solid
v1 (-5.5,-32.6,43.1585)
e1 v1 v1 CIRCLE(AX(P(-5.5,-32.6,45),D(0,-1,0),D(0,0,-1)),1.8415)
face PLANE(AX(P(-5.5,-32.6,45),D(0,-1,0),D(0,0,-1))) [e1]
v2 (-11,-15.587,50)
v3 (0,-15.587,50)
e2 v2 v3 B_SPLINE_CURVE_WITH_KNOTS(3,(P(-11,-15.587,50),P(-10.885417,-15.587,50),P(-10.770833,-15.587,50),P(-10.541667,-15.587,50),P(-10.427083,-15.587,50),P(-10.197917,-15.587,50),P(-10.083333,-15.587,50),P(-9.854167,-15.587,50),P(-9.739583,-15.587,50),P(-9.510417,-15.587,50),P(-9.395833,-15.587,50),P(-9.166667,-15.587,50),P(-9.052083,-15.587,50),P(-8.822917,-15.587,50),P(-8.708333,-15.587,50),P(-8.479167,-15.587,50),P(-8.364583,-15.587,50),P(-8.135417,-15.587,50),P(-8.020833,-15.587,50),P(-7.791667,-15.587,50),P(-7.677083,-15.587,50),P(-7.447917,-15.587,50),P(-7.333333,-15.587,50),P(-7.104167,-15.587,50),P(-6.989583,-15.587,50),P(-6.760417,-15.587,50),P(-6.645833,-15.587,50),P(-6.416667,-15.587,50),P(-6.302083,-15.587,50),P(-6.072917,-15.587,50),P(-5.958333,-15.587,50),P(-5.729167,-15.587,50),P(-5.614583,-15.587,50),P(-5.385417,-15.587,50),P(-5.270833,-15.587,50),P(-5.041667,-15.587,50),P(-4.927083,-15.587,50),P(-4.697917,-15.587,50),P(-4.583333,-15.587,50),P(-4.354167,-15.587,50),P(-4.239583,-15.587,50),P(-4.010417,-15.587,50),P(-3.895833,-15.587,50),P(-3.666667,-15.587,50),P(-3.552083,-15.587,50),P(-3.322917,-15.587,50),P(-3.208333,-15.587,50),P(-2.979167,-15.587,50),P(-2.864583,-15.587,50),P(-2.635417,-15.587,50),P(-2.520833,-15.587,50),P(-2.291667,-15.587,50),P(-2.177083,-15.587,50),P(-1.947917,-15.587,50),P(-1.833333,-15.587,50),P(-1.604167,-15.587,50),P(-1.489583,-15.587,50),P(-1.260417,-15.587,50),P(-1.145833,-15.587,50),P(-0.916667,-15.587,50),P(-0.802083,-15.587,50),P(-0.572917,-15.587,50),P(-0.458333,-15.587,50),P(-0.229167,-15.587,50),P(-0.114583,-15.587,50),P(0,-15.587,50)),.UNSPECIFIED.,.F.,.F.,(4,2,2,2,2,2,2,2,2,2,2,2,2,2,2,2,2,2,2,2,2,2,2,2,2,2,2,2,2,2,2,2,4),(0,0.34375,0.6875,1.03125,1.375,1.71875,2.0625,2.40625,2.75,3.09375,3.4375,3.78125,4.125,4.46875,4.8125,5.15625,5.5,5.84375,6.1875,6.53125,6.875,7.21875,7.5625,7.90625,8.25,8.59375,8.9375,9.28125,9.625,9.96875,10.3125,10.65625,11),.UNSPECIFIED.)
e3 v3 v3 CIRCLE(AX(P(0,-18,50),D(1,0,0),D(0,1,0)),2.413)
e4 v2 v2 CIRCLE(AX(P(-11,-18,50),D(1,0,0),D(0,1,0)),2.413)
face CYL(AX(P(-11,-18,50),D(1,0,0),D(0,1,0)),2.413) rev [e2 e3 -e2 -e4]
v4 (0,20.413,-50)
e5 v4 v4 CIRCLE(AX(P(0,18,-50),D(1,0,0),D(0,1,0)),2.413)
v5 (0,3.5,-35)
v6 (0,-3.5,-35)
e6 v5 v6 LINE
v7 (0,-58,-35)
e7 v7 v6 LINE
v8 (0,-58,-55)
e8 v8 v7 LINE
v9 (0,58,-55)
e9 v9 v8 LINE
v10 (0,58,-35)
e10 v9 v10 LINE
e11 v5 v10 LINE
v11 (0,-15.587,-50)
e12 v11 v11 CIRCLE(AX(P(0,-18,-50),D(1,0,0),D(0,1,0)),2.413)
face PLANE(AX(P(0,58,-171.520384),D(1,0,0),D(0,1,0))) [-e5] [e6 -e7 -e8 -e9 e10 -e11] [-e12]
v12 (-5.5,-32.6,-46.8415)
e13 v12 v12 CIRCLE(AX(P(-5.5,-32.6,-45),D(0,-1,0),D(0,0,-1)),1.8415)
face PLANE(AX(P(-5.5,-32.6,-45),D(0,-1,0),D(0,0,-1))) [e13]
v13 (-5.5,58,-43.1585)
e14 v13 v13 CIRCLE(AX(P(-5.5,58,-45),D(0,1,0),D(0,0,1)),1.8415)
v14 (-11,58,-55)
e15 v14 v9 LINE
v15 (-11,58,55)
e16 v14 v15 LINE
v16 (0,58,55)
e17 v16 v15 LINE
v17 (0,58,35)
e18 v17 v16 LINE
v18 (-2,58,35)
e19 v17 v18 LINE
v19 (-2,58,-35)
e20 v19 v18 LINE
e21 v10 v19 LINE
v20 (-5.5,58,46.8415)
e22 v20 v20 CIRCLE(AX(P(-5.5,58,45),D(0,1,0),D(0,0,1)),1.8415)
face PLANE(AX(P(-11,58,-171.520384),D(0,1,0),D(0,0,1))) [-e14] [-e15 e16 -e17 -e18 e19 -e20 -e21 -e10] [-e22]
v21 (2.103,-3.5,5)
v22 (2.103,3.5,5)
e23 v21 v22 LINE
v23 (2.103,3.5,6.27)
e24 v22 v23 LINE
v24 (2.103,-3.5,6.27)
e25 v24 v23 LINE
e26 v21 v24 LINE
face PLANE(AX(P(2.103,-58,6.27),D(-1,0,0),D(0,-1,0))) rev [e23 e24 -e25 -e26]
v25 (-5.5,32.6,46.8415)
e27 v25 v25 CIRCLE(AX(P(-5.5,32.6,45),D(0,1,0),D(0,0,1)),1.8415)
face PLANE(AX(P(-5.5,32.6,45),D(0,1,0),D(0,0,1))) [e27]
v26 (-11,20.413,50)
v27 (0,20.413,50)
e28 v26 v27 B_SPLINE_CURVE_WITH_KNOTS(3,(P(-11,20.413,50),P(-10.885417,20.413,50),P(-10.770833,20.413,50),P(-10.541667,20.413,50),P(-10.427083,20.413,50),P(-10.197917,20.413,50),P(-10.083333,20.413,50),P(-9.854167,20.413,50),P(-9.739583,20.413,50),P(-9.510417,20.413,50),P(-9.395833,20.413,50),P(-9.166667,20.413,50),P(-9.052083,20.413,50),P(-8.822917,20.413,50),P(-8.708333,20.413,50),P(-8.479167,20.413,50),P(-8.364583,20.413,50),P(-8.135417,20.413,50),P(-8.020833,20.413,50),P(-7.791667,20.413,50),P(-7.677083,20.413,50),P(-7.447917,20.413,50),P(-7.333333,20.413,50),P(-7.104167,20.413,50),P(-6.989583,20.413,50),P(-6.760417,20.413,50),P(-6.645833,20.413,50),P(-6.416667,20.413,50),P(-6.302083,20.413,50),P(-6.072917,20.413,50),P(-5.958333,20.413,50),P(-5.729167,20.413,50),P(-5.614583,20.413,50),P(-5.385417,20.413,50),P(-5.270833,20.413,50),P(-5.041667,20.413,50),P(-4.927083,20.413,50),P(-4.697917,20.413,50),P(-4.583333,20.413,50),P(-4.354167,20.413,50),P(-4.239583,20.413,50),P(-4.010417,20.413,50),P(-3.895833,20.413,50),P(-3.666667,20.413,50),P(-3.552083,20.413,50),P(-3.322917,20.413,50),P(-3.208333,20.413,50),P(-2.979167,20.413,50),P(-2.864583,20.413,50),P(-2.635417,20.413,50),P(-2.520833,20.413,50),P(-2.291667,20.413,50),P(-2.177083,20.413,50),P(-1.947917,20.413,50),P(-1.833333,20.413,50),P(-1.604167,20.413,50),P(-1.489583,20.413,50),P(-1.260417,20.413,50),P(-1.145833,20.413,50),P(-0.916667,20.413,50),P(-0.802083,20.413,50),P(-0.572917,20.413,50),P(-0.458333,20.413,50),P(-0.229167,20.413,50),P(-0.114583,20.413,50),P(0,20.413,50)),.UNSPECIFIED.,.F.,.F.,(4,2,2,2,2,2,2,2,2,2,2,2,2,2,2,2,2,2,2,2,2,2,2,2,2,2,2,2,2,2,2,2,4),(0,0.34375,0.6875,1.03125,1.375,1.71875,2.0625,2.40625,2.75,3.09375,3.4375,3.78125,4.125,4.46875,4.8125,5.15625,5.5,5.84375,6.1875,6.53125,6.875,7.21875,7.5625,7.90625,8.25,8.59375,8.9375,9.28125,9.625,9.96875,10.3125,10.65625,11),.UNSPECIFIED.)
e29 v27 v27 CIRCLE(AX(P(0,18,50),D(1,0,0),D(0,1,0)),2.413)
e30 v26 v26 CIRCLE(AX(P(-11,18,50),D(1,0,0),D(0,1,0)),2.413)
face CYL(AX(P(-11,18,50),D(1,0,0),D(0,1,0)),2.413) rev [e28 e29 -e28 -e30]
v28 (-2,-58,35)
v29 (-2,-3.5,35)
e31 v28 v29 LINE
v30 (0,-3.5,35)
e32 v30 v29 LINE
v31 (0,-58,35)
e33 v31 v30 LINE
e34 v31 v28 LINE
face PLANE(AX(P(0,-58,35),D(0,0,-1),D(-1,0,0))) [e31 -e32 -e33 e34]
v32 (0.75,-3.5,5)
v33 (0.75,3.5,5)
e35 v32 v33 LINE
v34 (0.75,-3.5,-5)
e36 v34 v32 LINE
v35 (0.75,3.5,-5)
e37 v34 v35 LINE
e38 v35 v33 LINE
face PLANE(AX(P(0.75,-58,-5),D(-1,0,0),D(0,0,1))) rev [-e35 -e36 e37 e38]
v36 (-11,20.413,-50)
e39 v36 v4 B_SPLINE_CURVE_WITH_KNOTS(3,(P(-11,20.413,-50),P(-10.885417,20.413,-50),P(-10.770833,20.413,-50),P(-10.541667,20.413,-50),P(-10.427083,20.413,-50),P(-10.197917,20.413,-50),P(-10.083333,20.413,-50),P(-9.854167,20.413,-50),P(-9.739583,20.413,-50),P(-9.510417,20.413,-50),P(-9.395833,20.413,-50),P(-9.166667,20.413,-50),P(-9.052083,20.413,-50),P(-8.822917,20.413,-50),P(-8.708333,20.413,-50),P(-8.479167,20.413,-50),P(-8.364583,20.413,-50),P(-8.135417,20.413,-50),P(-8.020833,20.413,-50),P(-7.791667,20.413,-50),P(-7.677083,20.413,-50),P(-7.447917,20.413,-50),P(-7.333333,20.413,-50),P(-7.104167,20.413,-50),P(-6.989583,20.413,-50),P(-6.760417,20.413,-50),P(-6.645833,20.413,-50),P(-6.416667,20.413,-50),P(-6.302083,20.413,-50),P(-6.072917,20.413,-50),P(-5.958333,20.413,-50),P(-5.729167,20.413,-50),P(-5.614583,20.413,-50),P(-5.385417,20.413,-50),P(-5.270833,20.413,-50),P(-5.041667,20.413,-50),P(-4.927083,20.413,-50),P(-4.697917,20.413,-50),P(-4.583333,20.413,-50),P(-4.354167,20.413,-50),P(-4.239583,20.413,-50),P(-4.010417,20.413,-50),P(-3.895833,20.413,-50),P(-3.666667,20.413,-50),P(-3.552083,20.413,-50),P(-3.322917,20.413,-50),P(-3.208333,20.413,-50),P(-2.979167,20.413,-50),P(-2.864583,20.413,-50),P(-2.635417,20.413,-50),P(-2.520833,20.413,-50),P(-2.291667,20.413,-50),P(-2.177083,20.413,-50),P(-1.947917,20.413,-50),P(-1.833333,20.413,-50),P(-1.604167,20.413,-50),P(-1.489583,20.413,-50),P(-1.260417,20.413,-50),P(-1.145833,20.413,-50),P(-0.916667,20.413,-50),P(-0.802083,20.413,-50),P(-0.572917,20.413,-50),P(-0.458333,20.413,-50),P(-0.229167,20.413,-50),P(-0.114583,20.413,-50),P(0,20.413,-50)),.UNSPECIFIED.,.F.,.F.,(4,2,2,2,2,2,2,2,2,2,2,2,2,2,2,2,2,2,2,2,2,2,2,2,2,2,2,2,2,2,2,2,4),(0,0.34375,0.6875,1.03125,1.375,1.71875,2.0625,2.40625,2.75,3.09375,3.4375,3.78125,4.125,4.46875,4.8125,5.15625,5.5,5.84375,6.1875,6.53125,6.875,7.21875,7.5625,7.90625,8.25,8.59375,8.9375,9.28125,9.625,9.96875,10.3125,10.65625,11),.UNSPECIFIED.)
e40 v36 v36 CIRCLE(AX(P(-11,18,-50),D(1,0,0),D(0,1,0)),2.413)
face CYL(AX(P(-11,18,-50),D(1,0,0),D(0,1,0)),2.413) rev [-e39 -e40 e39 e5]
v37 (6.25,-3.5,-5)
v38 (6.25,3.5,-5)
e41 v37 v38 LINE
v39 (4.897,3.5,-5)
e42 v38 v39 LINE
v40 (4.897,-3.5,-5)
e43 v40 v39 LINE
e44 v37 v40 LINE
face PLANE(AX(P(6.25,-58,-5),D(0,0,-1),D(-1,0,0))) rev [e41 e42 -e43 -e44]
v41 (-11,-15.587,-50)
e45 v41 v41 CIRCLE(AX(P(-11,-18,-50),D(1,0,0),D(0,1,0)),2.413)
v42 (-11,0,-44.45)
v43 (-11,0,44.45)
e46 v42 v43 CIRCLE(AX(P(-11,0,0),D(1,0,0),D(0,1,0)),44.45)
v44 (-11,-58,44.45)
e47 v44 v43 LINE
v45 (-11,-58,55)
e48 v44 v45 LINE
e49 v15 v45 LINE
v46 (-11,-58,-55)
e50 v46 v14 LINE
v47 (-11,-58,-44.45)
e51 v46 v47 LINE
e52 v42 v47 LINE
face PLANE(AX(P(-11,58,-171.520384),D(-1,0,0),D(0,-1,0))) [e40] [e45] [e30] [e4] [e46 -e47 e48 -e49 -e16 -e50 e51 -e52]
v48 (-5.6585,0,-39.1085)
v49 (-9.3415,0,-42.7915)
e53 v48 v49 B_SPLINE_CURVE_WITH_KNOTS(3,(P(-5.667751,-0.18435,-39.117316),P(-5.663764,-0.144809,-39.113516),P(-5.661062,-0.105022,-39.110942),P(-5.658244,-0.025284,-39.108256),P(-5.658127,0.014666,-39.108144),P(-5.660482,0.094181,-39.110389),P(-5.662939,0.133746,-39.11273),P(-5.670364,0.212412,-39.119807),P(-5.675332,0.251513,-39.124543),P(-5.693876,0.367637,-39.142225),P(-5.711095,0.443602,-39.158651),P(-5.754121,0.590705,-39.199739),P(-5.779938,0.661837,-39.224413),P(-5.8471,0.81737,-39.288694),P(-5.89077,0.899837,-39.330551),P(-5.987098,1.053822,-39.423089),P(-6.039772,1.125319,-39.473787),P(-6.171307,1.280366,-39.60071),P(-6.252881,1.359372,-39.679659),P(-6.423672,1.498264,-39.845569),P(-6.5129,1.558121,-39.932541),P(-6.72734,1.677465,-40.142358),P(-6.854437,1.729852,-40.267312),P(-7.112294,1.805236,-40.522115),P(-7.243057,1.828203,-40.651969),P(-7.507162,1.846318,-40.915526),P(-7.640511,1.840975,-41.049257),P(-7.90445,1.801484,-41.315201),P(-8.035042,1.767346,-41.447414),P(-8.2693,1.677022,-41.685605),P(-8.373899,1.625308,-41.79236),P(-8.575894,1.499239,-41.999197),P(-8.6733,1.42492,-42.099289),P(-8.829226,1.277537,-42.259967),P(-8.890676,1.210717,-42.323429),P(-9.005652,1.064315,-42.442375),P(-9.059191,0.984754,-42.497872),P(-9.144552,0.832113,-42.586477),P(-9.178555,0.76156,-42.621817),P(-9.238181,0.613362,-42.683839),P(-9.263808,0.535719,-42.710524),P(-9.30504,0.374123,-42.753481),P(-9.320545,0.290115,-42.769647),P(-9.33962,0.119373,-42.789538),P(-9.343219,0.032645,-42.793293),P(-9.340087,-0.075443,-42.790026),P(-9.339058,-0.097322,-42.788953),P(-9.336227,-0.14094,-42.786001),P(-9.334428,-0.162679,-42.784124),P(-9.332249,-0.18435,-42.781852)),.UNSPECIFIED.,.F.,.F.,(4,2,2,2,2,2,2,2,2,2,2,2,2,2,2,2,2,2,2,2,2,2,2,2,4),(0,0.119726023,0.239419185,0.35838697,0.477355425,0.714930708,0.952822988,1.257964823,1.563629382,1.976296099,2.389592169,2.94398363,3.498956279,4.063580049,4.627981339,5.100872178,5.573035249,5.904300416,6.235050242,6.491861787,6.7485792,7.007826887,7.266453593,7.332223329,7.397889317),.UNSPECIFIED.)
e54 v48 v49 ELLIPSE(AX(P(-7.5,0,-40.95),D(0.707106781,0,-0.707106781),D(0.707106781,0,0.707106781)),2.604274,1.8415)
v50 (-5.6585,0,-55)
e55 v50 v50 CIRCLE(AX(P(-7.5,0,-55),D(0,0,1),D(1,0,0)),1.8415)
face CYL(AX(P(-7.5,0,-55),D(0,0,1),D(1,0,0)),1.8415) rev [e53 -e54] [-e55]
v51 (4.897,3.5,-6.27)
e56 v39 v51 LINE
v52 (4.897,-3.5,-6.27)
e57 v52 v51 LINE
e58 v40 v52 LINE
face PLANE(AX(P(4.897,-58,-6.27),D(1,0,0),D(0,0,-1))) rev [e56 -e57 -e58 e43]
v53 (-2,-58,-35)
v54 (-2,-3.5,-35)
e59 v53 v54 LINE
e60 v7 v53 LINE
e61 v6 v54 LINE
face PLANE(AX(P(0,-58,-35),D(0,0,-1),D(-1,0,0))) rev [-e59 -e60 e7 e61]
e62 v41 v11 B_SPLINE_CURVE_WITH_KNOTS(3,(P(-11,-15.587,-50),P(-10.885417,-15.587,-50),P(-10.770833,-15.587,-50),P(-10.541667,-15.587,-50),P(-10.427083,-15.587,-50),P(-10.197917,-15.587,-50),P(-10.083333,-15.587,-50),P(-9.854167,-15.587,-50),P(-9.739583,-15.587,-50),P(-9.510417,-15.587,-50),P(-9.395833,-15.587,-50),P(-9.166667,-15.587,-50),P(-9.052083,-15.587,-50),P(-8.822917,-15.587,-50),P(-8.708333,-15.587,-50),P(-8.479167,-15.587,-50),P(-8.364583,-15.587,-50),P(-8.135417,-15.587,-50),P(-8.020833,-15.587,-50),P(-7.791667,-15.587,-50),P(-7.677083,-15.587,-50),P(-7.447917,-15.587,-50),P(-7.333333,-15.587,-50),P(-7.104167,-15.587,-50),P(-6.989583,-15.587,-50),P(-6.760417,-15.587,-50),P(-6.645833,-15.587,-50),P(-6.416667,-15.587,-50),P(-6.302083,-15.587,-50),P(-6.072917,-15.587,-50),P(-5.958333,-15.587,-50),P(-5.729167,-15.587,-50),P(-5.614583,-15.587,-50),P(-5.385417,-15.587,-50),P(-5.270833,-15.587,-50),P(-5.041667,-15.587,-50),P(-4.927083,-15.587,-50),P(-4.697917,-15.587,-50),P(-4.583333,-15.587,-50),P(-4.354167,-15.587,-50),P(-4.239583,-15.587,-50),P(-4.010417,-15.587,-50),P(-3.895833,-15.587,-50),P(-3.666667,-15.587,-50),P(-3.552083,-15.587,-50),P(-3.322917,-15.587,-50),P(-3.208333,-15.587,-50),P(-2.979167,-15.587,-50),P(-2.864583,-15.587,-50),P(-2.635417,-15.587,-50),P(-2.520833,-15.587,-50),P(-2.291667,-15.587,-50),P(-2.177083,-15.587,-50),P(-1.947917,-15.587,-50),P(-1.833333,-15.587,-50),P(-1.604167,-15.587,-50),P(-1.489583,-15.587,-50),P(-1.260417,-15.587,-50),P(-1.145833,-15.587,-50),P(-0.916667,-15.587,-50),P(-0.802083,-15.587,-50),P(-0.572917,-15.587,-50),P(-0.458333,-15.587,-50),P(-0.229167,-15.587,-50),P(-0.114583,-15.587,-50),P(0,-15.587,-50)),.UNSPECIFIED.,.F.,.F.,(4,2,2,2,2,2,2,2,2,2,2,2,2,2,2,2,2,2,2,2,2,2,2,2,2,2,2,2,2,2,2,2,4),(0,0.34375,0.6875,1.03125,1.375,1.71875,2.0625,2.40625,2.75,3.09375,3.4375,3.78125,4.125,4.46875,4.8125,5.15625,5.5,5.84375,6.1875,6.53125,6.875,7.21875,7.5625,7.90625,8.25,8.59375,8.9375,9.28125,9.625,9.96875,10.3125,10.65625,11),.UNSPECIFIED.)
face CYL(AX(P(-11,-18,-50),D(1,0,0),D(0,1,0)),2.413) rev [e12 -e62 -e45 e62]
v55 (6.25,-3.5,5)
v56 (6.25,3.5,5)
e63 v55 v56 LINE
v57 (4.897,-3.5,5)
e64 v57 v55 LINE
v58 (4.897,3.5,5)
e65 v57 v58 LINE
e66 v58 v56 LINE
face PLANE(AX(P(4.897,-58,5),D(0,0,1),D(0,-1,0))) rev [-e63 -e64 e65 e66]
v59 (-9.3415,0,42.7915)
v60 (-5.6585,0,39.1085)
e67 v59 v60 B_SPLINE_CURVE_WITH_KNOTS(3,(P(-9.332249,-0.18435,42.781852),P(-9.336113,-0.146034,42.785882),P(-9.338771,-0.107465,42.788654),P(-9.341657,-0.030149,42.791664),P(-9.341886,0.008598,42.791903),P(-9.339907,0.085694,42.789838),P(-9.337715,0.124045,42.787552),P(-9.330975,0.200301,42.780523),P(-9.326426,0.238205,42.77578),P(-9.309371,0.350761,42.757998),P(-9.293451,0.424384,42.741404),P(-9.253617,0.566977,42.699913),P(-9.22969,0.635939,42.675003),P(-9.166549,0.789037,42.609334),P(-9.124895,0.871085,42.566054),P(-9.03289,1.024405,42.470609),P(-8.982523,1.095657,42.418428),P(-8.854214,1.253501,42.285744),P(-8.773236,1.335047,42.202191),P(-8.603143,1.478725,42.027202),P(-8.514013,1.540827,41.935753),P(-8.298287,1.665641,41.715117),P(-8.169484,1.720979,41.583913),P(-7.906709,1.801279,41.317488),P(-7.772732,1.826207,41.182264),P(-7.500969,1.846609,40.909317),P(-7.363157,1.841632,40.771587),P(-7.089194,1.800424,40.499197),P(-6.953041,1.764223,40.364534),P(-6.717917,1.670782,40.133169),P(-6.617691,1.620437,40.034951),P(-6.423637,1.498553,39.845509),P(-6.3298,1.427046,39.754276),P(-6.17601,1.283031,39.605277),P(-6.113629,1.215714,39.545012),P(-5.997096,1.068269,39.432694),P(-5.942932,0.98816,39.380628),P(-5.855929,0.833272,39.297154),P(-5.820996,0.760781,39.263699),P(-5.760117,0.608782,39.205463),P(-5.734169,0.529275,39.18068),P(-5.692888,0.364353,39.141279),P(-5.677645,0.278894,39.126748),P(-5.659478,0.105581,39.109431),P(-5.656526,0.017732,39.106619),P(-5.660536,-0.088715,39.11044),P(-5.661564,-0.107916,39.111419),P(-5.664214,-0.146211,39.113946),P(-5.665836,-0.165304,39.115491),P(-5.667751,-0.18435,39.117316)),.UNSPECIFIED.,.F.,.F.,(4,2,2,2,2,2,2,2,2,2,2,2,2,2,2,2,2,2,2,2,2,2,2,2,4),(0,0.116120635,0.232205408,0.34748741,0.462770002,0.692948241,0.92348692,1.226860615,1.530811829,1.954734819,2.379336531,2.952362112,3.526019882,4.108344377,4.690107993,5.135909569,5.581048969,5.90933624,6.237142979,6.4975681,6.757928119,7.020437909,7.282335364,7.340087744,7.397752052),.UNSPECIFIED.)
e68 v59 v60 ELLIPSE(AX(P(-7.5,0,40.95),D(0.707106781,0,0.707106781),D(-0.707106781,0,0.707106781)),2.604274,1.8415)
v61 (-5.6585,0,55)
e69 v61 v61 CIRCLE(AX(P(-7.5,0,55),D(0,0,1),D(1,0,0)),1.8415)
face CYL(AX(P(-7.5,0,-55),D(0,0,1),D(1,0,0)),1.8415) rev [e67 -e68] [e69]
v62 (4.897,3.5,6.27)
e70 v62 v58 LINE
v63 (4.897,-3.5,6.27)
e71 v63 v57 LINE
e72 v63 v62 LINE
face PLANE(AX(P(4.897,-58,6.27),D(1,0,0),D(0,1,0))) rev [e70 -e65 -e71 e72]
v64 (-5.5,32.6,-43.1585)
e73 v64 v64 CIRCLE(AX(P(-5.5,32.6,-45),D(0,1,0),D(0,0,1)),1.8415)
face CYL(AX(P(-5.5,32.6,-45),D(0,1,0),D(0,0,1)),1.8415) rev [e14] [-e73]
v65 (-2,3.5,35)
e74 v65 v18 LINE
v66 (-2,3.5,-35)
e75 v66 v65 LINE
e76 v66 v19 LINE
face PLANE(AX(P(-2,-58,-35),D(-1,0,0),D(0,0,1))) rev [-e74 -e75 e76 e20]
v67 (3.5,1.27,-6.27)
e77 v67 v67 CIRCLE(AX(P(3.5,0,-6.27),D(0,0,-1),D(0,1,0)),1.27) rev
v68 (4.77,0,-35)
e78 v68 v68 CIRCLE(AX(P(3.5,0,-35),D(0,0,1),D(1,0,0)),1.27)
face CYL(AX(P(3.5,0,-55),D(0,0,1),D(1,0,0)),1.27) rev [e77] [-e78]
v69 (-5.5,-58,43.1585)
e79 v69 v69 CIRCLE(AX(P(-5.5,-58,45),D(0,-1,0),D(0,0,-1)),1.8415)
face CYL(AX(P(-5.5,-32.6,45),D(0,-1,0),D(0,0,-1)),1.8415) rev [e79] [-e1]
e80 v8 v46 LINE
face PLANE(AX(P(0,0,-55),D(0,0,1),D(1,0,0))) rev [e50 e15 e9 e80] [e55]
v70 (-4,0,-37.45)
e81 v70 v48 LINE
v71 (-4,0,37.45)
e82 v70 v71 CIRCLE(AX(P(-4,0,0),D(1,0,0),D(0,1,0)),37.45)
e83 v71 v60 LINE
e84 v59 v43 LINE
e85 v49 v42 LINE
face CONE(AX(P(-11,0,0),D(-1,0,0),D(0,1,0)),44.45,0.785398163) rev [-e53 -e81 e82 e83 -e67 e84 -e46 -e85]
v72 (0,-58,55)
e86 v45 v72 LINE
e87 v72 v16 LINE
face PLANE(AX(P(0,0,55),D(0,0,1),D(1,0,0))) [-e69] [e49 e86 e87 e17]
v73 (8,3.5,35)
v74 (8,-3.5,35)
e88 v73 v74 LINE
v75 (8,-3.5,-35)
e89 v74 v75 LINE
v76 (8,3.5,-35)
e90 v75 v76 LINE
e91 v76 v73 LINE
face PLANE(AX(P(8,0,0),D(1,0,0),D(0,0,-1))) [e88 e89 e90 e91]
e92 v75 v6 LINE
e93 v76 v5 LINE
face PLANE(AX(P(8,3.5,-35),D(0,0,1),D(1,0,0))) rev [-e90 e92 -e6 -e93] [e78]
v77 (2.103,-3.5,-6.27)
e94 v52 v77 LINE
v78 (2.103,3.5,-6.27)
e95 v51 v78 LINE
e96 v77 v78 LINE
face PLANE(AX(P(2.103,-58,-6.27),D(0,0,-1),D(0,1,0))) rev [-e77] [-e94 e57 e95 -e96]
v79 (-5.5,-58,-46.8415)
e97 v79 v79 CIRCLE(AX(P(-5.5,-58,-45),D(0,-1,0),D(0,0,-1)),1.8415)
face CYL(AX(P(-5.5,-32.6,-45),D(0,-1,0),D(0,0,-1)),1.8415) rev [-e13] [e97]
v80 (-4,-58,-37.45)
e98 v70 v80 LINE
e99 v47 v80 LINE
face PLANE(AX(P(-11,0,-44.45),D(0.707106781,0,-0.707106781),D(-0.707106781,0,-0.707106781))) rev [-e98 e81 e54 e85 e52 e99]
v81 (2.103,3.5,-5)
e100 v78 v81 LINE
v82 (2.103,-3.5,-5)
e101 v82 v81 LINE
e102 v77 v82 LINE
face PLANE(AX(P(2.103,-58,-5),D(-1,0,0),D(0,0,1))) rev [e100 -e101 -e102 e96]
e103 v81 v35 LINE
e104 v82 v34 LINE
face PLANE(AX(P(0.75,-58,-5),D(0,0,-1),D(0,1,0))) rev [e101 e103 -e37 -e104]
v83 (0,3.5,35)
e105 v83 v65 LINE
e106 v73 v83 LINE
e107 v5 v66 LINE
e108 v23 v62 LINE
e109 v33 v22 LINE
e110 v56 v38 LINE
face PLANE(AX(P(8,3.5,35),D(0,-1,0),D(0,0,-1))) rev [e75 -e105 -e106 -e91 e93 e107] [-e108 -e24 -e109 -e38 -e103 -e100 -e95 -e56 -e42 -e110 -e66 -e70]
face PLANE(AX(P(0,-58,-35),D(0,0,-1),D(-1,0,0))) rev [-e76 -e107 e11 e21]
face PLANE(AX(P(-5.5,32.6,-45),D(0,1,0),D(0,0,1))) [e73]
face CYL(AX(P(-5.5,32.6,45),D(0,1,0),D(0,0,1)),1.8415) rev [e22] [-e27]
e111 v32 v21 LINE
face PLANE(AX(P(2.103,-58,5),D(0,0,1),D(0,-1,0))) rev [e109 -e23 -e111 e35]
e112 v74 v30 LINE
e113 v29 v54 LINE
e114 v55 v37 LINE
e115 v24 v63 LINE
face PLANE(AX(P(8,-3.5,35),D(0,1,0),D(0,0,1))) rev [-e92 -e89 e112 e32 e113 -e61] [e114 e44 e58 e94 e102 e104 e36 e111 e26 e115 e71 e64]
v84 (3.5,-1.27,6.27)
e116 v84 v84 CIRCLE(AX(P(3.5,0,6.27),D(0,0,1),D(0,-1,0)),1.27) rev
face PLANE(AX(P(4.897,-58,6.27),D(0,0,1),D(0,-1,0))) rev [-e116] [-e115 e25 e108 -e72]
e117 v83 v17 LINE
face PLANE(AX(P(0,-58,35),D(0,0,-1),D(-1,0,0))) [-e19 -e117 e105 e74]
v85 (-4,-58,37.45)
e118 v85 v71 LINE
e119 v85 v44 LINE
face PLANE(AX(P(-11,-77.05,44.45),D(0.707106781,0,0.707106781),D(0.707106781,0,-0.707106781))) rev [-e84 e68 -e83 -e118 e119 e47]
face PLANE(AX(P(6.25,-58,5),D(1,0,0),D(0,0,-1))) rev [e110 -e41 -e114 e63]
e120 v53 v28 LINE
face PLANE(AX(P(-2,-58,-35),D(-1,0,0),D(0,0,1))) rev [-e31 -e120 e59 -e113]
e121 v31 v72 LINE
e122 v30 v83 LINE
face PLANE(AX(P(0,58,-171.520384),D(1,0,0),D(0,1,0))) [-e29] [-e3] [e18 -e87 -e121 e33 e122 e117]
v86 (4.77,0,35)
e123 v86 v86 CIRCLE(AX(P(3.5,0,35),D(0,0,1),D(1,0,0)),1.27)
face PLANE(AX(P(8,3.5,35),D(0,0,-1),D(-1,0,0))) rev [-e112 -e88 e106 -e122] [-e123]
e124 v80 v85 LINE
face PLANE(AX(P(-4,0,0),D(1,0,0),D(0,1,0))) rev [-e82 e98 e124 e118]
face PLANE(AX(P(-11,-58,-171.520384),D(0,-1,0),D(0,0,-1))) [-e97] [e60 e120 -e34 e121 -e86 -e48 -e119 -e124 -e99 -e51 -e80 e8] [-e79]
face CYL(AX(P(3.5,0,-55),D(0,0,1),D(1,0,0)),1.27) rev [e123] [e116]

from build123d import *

# Parameters (mm, degrees)
SKETCH2_W              = 11
SKETCH2_H              = 116
BOSS_EXTRUDE2_DEPTH    = 109.999999964
SKETCH3_W              = 2
SKETCH3_H              = 70
CUT_EXTRUDE1_DEPTH     = 129.848748531
CUT_EXTRUDE2_DEPTH     = 7
CUT_EXTRUDE2_DRAFT     = -45
SKETCH6_W              = 70
SKETCH6_H              = 7
BOSS_EXTRUDE3_DEPTH    = 10
SKETCH7_R              = 1.27
CUT_EXTRUDE3_DEPTH     = 108.633637835
CUT_EXTRUDE4_DEPTH     = 84.23610994
CUT_EXTRUDE5_START     = -109.999999964
CUT_EXTRUDE5_OUTLINE_R = 1.8415
CUT_EXTRUDE5_DEPTH     = 109.999999964
SKETCH10_R             = 1.8415
CUT_EXTRUDE6_DEPTH     = 25.4
CUT_EXTRUDE7_START     = -25.4
SKETCH11_R             = 1.8415
CUT_EXTRUDE7_DEPTH     = 25.4
SKETCH12_R             = 2.413
CUT_EXTRUDE8_DEPTH     = 81.684571085


# Read off the part's stored shape, not the designer's step: Cut-Extrude5
with BuildPart() as part:
    # Sketch2 → Boss-Extrude2 (new body)
    with BuildSketch(Plane.XY.offset(54.999999982)):
        with Locations((-5.5, 0)):
            Rectangle(SKETCH2_W, SKETCH2_H)
    extrude(amount=-BOSS_EXTRUDE2_DEPTH)

    # Sketch3 → Cut-Extrude1 (cut, through all)
    with BuildSketch(Plane(origin=(0, 58, 0), x_dir=(1, 0, 0), z_dir=(0, 1, 0))):
        with Locations((-1, 1.8e-08)):
            Rectangle(SKETCH3_W, SKETCH3_H)
    extrude(amount=-CUT_EXTRUDE1_DEPTH, mode=Mode.SUBTRACT)


with BuildPart() as cut_extrude2_tool:
    # Sketch5 → Cut-Extrude2 (with draft: the straight prism first)
    with BuildSketch(Plane.ZY.offset(11)):
        with BuildLine():
            Line((-44.45, 0), (-44.45, -77.05))
            Line((-44.45, -77.05), (44.45, -77.05))
            Line((44.45, -77.05), (44.45, 0))
            ThreePointArc((44.45, 0), (0, 44.45), (-44.45, 0))
        make_face()
    extrude(amount=-CUT_EXTRUDE2_DEPTH)
    # Cut-Extrude2: the draft: its side faces are tilted about the plane it starts from
    cut_extrude2_sides = [cut_extrude2_tool.faces().sort_by_distance(p)[0] for p in [
        (-7.5, -38.525, -44.45),
        (-7.5, -77.05, 0),
        (-7.5, -38.525, 44.45),
        (-7.5, 44.45, 0),
    ]]
    draft(cut_extrude2_sides, Plane.ZY.offset(11), CUT_EXTRUDE2_DRAFT)


with BuildPart() as part_1:
    add(part.part)

    # Cut-Extrude2: cut by cut_extrude2_tool
    add(cut_extrude2_tool.part, mode=Mode.SUBTRACT)

    # Sketch6 → Boss-Extrude3 (add)
    with BuildSketch(Plane(origin=(-2, 0, 0), x_dir=(0, 0, -1), z_dir=(1, 0, 0))):
        with Locations((1.8e-08, 0)):
            Rectangle(SKETCH6_W, SKETCH6_H)
    extrude(amount=BOSS_EXTRUDE3_DEPTH)

    # Sketch7 → Cut-Extrude3 (cut, through all)
    with BuildSketch(Plane.XY.offset(34.999999982)):
        with Locations((3.5, 0)):
            Circle(SKETCH7_R)
    extrude(amount=-CUT_EXTRUDE3_DEPTH, mode=Mode.SUBTRACT)

    # Sketch8 → Cut-Extrude4 (cut, through all)
    with BuildSketch(Plane(origin=(0, 3.5, 0), x_dir=(1, 0, 0), z_dir=(0, 1, 0))):
        Polygon((0.75, 5), (0.75, -5), (2.103, -5), (2.103, -6.27), (4.897, -6.27), (4.897, -5), (6.25, -5), (6.25, 5), (4.897, 5), (4.897, 6.27), (2.103, 6.27), (2.103, 5), align=None)
    extrude(amount=-CUT_EXTRUDE4_DEPTH, mode=Mode.SUBTRACT)

    # Cut-Extrude5 outline → Cut-Extrude5 (cut)
    with BuildSketch(Plane.XY.offset(54.999999982).offset(CUT_EXTRUDE5_START)):
        with Locations((-7.5, 0)):
            Circle(CUT_EXTRUDE5_OUTLINE_R)
    extrude(amount=CUT_EXTRUDE5_DEPTH, mode=Mode.SUBTRACT)

    # Sketch10 → Cut-Extrude6 (cut)
    with BuildSketch(Plane(origin=(0, 58, 0), x_dir=(1, 0, 0), z_dir=(0, 1, 0))):
        with Locations(Location((-5.5, -44.999999982, 0), (0, 0, 270))):
            Circle(SKETCH10_R)
        with Locations(Location((-5.5, 44.999999982, 0), (0, 0, 270))):
            Circle(SKETCH10_R)
    extrude(amount=-CUT_EXTRUDE6_DEPTH, mode=Mode.SUBTRACT)

    # Sketch11 → Cut-Extrude7 (cut)
    with BuildSketch(Plane.XZ.offset(58).offset(CUT_EXTRUDE7_START)):
        with Locations(Location((-5.5, 44.999999982, 0), (0, 0, 90))):
            Circle(SKETCH11_R)
        with Locations(Location((-5.5, -44.999999982, 0), (0, 0, 90))):
            Circle(SKETCH11_R)
    extrude(amount=CUT_EXTRUDE7_DEPTH, mode=Mode.SUBTRACT)

    # Sketch12 → Cut-Extrude8 (cut, through all)
    with BuildSketch(Plane(origin=(0, 0, 0), x_dir=(0, 0, -1), z_dir=(1, 0, 0))):
        with Locations(Location((-49.999999982, 18, 0), (0, 0, 90))):
            Circle(SKETCH12_R)
        with Locations(Location((-49.999999982, -18, 0), (0, 0, 90))):
            Circle(SKETCH12_R)
        with Locations(Location((49.999999982, -18, 0), (0, 0, 90))):
            Circle(SKETCH12_R)
        with Locations(Location((49.999999982, 18, 0), (0, 0, 90))):
            Circle(SKETCH12_R)
    extrude(amount=-CUT_EXTRUDE8_DEPTH, mode=Mode.SUBTRACT)


solid = part_1.part
